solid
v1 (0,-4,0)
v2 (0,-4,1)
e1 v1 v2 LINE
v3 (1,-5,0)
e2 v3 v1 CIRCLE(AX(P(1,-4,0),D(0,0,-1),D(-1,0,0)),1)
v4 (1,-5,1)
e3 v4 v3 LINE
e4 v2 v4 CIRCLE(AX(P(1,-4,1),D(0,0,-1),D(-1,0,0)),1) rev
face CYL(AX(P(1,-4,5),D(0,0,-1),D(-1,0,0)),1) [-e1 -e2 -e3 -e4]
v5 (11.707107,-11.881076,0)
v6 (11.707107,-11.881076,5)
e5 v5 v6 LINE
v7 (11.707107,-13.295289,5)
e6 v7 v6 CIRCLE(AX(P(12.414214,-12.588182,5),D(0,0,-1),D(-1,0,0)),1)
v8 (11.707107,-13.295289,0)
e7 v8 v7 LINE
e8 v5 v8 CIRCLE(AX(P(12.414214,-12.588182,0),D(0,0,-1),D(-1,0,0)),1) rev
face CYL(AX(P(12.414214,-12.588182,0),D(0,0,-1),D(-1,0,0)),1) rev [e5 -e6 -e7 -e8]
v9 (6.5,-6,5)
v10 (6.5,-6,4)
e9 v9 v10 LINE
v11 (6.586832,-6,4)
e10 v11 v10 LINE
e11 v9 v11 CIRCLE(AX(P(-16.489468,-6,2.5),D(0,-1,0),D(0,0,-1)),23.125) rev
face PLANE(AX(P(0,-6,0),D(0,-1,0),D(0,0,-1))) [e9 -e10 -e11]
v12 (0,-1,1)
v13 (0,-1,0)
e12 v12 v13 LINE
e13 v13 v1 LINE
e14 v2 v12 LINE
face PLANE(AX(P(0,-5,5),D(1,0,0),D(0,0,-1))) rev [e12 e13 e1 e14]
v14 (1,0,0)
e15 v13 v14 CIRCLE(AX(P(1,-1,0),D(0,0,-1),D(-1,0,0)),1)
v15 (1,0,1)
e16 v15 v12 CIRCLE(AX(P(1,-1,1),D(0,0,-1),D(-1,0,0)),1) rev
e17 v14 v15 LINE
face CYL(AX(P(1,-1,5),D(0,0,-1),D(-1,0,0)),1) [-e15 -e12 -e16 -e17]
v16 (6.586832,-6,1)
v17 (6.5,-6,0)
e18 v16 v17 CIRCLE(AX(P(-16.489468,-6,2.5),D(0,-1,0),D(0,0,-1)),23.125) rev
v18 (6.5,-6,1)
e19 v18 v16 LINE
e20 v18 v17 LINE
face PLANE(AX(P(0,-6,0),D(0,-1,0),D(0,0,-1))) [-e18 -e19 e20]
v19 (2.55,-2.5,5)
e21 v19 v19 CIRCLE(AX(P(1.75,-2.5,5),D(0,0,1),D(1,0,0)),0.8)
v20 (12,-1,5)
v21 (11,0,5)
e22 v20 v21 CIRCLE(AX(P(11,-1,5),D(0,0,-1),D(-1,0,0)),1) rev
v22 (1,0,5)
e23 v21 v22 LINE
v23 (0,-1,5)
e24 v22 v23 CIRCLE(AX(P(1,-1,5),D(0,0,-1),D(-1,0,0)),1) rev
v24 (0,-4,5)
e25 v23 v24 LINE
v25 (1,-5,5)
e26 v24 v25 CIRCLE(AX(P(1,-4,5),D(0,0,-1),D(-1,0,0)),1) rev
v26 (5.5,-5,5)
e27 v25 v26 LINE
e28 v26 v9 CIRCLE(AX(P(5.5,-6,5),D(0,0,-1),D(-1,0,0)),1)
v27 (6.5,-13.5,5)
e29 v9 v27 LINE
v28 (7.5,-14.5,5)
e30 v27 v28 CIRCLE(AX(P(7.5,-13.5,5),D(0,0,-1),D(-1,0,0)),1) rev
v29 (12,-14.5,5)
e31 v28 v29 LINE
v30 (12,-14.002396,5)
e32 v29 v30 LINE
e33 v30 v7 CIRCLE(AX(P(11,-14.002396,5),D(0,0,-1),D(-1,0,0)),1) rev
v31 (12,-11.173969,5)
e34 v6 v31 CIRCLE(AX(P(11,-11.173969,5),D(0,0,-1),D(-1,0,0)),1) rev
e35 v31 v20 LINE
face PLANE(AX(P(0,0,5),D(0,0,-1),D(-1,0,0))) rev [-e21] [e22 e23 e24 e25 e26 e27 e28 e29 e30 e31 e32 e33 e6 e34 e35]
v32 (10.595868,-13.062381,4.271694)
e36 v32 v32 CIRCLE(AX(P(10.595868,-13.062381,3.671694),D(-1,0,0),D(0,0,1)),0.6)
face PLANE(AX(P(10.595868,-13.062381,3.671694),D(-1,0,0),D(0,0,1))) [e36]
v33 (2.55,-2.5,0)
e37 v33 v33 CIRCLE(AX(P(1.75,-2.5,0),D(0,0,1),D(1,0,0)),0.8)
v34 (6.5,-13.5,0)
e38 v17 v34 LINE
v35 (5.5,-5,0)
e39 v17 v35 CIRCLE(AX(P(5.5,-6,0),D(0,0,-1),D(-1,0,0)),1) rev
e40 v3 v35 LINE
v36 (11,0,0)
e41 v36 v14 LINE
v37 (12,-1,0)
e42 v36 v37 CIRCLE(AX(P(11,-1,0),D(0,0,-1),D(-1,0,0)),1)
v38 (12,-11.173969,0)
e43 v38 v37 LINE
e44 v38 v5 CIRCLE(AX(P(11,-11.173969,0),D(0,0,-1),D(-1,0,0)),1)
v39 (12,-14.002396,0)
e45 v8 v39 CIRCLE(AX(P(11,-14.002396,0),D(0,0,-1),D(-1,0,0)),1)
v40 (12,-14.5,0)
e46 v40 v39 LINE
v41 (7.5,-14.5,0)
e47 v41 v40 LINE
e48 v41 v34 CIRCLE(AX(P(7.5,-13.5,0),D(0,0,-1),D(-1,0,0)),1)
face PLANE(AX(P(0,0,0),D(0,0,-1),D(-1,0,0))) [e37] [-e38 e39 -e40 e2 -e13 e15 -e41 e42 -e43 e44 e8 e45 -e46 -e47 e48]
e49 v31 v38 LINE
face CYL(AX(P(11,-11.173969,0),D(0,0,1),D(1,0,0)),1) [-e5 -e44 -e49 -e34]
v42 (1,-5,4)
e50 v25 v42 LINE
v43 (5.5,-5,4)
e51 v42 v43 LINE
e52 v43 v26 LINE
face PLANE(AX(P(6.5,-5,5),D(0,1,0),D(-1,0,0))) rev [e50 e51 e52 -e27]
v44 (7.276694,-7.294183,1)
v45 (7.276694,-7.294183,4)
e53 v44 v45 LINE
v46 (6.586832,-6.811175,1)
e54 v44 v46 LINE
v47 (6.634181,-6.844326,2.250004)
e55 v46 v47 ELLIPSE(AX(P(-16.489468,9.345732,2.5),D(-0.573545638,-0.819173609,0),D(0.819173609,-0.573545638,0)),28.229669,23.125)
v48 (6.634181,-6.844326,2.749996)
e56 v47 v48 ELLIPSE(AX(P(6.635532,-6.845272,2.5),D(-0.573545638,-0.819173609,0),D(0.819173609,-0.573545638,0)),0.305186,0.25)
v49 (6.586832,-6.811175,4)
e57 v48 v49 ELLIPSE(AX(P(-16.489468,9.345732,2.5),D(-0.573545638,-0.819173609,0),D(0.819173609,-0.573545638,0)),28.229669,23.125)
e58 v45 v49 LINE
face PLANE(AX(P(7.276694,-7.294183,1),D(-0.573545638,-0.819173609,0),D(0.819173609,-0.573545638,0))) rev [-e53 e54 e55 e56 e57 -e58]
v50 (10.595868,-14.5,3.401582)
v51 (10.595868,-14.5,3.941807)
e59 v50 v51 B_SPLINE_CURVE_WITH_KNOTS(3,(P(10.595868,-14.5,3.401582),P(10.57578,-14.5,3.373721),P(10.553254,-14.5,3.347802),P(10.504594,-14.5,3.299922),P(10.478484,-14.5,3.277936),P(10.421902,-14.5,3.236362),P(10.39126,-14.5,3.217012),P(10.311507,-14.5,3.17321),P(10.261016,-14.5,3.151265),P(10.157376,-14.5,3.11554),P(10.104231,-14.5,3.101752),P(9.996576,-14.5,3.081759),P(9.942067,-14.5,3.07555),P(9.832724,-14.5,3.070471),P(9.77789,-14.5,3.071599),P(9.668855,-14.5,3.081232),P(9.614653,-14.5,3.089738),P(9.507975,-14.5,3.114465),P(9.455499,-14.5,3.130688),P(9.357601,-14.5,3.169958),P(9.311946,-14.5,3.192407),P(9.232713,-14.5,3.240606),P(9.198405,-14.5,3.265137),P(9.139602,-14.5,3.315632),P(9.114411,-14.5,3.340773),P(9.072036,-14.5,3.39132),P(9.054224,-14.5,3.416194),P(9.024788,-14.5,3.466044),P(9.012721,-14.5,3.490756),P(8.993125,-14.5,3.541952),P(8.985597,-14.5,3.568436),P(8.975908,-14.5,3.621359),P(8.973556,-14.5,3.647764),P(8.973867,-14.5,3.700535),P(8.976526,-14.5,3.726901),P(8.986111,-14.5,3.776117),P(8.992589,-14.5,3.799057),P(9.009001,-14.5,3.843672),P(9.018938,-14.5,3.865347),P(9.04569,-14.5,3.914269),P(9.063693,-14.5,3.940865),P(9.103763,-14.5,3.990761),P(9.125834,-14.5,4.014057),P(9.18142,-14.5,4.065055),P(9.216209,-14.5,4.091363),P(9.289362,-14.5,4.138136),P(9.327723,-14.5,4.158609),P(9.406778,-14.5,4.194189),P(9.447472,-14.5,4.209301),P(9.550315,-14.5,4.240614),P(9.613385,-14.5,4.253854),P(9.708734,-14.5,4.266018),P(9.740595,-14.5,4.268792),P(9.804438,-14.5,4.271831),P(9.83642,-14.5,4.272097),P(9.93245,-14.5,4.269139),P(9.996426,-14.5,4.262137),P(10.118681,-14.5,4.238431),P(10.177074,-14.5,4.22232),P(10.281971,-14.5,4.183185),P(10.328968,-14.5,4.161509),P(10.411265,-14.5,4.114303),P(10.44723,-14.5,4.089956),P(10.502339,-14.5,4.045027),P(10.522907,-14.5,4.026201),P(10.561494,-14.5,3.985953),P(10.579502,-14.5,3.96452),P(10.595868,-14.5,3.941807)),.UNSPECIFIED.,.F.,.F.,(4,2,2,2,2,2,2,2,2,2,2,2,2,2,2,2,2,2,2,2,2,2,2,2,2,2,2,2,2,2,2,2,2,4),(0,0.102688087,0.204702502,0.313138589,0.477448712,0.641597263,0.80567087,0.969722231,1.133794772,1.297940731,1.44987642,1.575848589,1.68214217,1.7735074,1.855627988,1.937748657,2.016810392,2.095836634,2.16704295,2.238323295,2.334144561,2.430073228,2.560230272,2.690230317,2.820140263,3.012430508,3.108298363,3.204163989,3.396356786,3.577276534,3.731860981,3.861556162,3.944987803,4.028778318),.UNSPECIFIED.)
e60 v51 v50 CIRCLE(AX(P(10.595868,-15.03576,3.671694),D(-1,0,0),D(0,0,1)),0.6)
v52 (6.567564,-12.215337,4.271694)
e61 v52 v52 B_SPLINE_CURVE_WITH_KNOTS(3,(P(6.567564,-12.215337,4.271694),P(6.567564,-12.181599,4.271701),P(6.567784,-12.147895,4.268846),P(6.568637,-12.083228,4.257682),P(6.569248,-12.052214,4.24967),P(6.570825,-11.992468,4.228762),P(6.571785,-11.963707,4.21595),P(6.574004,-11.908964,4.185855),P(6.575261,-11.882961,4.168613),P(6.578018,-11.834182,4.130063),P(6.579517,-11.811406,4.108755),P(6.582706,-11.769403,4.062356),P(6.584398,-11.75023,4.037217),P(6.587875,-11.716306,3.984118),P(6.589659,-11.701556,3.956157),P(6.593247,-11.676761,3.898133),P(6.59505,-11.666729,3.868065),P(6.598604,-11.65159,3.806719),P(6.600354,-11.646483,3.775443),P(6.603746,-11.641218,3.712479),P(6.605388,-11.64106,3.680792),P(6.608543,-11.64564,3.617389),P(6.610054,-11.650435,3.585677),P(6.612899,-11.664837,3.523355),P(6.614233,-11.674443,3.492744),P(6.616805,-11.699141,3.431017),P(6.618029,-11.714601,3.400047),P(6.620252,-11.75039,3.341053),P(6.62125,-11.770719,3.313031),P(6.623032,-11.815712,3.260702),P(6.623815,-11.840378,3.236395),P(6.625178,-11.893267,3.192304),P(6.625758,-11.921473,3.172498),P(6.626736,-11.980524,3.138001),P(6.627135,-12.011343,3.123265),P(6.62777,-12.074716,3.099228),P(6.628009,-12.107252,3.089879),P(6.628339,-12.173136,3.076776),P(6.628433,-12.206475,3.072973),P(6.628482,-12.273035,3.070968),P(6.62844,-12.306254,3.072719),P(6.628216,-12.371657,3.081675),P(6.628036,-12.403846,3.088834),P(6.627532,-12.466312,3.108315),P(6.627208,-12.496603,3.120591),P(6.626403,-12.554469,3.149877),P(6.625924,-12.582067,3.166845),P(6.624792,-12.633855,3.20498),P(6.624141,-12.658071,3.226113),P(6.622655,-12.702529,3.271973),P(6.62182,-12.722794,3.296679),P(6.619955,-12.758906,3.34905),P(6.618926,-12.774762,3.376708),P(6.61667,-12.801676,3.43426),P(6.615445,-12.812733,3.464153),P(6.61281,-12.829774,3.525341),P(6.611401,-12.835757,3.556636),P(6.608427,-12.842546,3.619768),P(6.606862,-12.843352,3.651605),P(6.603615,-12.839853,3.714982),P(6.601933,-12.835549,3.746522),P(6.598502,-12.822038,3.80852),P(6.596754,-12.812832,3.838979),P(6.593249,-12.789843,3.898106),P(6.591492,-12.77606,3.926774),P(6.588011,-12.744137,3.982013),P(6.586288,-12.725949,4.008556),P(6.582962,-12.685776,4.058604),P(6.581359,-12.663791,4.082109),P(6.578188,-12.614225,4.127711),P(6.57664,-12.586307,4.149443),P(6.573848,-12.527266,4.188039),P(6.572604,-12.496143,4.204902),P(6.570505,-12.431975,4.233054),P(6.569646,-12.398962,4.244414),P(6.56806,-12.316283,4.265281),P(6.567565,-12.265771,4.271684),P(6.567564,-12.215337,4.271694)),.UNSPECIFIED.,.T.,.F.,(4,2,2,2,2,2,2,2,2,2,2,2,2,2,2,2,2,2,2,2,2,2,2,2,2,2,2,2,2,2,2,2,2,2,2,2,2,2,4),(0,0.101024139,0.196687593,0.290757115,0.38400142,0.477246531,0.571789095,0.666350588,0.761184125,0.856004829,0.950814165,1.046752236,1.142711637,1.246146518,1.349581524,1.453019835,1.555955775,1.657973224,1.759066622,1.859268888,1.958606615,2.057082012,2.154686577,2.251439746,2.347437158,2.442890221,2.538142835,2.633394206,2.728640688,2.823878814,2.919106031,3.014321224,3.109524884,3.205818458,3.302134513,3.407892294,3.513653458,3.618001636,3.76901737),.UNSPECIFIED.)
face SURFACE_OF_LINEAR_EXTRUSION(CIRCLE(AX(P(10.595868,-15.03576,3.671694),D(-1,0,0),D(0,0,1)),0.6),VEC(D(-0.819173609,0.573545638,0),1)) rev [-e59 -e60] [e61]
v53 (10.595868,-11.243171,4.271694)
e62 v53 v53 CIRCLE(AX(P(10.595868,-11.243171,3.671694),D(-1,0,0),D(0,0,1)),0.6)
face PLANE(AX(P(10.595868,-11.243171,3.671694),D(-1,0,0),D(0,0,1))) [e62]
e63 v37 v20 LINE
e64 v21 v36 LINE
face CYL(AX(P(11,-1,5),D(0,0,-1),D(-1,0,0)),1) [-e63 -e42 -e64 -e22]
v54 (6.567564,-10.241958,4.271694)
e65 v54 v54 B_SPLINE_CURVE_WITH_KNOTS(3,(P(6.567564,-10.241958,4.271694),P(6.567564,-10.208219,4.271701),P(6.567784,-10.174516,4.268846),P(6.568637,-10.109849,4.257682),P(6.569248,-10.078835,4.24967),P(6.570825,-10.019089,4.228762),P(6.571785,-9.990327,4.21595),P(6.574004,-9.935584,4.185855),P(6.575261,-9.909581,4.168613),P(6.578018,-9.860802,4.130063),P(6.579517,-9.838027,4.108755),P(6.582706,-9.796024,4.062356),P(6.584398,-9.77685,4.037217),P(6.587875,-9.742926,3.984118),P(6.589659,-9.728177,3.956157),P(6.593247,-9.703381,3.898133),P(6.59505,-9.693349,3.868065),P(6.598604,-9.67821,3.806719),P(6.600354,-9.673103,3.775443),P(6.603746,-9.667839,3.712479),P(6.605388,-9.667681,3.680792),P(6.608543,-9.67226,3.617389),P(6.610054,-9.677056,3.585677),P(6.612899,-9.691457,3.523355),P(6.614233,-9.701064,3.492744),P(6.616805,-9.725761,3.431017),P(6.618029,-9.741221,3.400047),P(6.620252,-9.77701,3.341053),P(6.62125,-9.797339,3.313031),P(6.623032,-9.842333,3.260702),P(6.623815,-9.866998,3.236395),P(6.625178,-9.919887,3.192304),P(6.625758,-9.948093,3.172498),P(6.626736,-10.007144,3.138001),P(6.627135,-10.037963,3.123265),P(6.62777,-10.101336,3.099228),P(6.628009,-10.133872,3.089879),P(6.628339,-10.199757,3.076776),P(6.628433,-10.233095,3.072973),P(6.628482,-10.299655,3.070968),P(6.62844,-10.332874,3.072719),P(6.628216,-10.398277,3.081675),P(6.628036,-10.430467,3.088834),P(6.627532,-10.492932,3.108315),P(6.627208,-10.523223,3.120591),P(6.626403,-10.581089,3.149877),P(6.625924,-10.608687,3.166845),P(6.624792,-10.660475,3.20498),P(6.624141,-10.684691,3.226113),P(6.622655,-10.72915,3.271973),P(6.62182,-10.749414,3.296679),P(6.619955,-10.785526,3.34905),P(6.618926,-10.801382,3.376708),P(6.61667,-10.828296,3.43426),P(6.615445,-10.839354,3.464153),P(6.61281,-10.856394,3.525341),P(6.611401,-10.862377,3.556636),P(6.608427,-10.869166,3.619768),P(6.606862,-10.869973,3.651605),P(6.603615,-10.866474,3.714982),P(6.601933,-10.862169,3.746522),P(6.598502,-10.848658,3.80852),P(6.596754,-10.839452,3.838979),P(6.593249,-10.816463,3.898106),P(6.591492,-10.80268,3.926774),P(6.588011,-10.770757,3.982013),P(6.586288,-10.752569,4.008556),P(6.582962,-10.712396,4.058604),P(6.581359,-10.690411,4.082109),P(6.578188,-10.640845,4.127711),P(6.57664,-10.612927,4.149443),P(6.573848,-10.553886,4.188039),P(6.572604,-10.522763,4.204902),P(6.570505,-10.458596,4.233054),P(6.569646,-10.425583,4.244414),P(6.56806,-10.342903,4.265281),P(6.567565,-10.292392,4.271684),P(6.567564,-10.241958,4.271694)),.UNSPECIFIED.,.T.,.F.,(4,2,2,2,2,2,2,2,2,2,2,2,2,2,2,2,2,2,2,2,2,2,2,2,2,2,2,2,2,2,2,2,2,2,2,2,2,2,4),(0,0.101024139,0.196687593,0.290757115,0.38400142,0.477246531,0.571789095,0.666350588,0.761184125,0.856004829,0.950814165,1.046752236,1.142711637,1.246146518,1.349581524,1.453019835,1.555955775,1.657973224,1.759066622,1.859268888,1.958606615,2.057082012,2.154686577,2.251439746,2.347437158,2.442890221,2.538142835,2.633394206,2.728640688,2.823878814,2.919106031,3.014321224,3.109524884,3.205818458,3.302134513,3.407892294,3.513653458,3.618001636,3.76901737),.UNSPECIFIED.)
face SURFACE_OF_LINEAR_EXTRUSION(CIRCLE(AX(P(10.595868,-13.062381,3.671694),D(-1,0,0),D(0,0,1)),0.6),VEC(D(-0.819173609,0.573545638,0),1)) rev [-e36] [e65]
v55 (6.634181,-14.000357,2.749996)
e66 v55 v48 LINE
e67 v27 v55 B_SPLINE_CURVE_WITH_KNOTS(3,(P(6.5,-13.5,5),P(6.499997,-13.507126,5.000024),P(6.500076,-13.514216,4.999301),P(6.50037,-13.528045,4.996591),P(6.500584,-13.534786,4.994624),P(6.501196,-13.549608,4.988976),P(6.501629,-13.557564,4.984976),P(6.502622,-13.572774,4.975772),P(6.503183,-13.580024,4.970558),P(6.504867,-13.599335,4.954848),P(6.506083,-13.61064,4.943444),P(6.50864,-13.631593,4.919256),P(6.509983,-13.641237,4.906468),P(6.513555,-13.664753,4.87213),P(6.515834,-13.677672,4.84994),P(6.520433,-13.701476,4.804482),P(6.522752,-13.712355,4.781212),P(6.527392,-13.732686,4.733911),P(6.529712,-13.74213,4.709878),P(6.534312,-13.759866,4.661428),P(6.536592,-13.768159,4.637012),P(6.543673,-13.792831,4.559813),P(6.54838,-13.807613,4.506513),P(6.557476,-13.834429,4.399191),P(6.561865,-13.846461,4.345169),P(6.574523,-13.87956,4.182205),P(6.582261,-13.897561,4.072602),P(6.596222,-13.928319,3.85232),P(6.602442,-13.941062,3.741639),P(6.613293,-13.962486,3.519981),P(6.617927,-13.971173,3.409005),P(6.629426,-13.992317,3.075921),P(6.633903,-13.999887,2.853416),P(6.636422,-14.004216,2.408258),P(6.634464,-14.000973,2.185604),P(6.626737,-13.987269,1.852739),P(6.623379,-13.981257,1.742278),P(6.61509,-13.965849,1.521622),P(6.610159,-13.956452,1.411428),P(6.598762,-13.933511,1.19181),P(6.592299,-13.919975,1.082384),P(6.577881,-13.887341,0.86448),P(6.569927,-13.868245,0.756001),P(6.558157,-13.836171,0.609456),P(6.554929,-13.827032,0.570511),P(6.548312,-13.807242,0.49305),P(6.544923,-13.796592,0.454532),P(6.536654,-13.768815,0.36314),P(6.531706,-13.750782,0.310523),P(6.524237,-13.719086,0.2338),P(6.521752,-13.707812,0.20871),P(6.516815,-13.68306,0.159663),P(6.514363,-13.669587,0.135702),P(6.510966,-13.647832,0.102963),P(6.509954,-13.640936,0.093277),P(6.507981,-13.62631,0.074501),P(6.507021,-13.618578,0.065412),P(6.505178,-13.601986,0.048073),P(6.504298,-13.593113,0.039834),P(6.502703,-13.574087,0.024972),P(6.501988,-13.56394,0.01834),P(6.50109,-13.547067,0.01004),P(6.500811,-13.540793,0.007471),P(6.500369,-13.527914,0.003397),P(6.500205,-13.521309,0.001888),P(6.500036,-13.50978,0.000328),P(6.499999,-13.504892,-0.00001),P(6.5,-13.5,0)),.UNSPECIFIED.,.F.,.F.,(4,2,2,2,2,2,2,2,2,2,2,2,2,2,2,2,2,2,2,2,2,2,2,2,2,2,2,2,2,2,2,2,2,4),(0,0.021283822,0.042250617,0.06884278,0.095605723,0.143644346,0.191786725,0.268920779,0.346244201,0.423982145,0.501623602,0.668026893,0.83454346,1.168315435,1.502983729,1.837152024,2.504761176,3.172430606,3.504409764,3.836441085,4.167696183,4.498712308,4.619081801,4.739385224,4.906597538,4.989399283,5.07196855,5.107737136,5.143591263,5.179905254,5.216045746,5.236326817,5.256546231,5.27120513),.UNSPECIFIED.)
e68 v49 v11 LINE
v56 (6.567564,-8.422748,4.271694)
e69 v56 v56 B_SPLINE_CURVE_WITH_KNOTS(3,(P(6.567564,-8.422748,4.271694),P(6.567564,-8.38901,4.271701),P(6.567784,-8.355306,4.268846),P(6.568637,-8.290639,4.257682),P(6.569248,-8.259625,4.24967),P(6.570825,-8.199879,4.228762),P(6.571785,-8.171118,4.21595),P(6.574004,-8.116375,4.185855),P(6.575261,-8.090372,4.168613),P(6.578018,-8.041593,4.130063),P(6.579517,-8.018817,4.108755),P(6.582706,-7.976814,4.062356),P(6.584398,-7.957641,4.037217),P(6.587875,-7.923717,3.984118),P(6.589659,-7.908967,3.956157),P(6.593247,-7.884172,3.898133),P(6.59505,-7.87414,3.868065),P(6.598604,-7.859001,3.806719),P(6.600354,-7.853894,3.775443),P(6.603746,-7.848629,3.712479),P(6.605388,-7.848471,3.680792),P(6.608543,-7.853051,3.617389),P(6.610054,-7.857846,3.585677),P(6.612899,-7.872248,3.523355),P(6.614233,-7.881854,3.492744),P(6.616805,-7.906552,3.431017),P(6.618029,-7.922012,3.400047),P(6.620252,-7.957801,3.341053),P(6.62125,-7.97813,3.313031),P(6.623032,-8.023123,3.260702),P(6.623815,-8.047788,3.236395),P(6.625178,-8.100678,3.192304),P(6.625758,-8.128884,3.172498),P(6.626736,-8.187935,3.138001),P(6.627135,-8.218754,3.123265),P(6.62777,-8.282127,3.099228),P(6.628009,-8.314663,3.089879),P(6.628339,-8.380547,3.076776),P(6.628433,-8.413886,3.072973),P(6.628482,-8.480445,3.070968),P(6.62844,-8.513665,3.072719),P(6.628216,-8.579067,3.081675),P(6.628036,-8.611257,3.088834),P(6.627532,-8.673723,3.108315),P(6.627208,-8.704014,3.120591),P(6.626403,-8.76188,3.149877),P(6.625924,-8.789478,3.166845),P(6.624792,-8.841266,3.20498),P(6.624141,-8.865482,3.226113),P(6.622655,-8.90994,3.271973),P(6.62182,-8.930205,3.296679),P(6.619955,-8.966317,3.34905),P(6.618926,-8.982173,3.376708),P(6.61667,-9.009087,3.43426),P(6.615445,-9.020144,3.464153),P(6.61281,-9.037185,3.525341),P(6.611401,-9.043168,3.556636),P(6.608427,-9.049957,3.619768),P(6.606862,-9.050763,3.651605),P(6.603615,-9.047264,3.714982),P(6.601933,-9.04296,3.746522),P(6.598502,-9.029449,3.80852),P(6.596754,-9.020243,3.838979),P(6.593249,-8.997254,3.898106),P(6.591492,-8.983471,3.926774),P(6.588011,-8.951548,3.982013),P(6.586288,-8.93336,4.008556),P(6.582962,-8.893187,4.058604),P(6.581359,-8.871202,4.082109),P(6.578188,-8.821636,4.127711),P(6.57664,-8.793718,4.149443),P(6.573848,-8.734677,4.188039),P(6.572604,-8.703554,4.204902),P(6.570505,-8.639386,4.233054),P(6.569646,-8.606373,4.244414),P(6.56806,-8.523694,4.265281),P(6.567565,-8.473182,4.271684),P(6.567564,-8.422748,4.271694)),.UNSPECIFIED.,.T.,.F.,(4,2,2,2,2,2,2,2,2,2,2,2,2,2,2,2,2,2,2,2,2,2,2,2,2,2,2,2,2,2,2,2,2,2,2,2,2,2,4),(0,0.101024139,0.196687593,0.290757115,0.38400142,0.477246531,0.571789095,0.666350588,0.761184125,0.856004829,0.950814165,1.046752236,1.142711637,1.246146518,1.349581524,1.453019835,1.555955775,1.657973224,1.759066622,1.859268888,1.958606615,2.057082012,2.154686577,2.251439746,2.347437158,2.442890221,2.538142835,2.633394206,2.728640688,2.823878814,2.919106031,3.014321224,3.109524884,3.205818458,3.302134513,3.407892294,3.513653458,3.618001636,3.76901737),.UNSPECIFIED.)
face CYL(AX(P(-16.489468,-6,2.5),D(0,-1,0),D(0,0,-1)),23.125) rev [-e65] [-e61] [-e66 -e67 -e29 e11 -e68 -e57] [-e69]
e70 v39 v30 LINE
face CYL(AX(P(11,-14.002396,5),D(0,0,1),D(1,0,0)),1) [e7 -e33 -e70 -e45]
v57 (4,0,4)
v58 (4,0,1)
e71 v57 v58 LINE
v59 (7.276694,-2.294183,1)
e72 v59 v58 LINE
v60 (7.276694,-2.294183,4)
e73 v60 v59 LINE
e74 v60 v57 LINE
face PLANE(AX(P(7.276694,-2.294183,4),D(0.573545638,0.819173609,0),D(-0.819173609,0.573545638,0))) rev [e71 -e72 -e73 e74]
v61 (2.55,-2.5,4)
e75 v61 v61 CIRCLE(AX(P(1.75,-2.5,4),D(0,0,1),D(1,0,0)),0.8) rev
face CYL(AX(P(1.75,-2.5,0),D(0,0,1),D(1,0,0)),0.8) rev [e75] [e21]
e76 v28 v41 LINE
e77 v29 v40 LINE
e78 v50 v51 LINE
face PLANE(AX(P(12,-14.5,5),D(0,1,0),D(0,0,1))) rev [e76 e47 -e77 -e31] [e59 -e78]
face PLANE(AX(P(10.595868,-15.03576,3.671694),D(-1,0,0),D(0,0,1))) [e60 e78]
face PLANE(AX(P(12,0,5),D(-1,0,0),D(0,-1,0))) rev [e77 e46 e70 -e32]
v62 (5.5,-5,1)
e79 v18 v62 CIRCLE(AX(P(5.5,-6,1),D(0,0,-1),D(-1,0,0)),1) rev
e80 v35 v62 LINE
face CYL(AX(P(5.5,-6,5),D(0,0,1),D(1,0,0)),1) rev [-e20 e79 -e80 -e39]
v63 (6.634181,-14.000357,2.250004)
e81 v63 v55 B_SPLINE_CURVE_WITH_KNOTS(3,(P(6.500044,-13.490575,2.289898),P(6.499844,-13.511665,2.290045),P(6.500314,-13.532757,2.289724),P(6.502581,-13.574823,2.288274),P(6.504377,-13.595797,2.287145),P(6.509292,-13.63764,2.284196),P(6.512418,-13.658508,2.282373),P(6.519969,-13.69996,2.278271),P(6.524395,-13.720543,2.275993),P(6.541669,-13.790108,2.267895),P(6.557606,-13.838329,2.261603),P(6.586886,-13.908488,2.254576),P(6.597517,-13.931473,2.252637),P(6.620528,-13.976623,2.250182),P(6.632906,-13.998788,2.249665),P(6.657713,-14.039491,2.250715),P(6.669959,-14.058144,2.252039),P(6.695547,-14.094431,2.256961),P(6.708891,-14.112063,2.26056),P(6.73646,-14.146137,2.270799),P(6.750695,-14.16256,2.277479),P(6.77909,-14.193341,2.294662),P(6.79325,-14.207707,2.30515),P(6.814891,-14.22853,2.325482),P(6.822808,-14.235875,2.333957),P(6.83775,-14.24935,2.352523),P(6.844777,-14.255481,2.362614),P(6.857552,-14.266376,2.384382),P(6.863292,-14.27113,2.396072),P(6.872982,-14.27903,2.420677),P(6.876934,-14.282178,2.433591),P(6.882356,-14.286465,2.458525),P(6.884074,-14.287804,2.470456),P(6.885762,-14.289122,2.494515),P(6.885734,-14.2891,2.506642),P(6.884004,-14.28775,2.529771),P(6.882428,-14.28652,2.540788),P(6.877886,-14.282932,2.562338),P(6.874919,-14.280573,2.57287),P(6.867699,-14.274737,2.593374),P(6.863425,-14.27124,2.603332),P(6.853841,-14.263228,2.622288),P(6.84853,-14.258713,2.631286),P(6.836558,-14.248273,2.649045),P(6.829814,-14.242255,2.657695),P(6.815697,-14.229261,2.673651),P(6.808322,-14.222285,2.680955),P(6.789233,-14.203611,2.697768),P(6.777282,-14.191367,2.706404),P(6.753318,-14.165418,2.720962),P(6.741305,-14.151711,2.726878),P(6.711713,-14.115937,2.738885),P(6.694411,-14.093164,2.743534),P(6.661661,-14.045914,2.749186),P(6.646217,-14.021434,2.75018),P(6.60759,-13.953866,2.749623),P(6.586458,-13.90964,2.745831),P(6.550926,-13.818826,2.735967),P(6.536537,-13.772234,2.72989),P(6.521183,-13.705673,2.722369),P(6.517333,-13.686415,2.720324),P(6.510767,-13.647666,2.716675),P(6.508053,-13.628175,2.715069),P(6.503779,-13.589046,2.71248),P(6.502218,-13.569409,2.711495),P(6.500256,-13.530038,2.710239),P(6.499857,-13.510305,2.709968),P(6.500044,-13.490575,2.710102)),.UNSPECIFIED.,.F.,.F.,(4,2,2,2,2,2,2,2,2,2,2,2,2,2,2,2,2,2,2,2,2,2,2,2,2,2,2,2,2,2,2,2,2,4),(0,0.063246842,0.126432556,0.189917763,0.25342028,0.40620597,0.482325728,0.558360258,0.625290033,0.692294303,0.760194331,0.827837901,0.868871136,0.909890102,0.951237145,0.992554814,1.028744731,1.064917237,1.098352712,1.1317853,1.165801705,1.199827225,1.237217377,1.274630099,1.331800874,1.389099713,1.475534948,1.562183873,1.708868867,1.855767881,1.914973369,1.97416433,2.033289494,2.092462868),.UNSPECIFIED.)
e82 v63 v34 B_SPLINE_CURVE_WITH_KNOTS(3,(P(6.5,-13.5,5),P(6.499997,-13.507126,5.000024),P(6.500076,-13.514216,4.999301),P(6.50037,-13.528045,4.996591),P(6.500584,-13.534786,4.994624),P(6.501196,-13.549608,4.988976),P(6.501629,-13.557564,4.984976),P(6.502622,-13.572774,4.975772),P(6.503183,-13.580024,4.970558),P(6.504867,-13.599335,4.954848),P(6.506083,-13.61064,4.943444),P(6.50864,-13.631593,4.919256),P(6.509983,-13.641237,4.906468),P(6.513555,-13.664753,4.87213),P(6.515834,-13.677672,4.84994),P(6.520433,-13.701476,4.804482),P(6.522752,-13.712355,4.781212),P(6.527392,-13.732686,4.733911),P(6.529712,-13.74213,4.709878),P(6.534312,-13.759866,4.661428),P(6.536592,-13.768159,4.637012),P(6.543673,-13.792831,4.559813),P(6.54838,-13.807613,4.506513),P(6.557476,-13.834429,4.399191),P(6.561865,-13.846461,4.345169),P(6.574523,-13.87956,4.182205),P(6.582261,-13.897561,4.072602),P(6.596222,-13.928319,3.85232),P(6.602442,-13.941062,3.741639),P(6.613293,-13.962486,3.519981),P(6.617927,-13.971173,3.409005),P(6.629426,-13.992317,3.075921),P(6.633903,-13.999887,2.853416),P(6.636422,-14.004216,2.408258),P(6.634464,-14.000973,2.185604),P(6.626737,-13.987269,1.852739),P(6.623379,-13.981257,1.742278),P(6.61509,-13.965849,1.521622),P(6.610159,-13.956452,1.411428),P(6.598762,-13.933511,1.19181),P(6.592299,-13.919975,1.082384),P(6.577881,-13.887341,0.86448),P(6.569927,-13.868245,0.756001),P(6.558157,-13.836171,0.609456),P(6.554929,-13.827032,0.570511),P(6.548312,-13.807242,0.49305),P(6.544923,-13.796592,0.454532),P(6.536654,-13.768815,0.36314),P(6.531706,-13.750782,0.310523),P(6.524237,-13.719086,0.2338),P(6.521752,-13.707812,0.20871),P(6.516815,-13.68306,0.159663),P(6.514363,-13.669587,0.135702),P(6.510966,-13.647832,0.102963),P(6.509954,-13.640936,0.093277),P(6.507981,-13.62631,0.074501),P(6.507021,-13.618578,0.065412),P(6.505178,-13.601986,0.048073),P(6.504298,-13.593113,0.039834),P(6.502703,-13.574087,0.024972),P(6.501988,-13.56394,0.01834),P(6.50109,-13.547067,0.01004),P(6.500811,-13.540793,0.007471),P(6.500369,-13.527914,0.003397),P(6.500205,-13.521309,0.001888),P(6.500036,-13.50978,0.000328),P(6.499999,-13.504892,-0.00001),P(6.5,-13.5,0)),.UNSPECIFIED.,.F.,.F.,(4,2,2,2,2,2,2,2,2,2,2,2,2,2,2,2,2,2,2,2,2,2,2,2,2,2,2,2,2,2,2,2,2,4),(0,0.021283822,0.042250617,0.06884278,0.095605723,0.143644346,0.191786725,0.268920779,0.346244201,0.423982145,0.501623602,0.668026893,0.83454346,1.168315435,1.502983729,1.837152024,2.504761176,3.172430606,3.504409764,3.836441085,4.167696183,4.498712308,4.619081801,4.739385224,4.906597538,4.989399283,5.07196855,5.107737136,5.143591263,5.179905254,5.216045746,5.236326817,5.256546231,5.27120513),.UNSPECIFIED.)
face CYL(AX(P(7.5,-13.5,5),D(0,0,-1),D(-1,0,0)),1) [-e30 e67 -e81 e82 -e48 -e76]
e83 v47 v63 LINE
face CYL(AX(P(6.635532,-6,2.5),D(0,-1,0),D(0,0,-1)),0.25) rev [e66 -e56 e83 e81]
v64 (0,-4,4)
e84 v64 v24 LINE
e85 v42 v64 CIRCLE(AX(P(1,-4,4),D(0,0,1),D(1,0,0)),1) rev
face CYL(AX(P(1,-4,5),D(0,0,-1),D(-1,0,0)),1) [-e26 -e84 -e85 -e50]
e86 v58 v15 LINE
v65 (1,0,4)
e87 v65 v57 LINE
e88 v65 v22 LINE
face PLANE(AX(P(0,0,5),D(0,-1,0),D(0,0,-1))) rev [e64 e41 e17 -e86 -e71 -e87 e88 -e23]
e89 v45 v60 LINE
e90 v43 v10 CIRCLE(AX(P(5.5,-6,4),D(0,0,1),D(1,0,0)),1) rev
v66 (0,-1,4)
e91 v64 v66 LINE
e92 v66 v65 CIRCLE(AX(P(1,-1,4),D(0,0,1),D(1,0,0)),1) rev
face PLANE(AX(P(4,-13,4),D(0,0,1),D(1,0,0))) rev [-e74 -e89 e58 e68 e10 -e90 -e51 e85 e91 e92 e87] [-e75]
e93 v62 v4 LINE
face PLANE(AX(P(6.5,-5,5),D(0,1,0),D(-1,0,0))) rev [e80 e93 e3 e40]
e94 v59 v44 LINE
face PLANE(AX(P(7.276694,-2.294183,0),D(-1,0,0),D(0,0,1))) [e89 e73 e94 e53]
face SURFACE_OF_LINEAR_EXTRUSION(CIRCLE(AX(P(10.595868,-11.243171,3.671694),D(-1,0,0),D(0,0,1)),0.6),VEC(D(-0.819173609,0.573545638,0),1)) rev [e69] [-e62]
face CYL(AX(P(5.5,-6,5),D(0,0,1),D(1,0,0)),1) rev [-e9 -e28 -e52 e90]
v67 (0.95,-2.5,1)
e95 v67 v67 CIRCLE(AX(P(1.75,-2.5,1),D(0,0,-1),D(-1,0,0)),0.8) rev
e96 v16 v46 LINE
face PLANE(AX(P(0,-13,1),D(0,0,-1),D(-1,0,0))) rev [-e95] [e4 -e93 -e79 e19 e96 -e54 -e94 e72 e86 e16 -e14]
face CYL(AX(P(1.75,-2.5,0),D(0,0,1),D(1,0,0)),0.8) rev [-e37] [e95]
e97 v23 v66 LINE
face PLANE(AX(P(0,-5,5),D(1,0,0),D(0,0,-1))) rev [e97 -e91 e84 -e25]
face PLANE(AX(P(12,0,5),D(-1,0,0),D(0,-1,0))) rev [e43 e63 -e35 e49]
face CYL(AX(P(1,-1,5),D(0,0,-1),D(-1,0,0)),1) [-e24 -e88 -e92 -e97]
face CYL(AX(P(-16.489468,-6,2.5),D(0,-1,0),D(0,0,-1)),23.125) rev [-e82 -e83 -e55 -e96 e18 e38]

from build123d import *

# Parameters (mm, degrees)
BOSS_EXTRUDE1_DEPTH = 5
SKETCH4_R           = 0.8
CUT_EXTRUDE3_DEPTH  = 20.474342094
SKETCH5_W           = 4
SKETCH5_H           = 3
CUT_EXTRUDE4_DEPTH  = 13
FILLET4_R           = 1
CUT_EXTRUDE5_DEPTH  = 20.474342094
FILLET6_R           = 1
CUT_EXTRUDE6_START  = -8.5
CUT_EXTRUDE6_DEPTH  = 8.002697112
SKETCH11_W          = 3
SKETCH11_H          = 5
CUT_EXTRUDE8_DEPTH  = 4
SKETCH12_R          = 0.6
CUT_EXTRUDE9_DEPTH  = 5
CUT_EXTRUDE10_REACH = 21.474
SKETCH9_R           = 0.25


# Read off the part's stored shape, not the designer's step: Cut-Extrude6
with BuildPart() as part:
    # Sketch1 → Boss-Extrude1 (new body)
    with BuildSketch(Plane.XY):
        Polygon((0, 0), (12, 0), (12, -14.5), (6.5, -14.5), (6.5, -5), (0, -5), align=None)
    extrude(amount=BOSS_EXTRUDE1_DEPTH)

    # Sketch4 → Cut-Extrude3 (cut, through all)
    with BuildSketch(Plane.XY.offset(5)):
        with Locations((1.75, -2.5)):
            Circle(SKETCH4_R)
    extrude(amount=-CUT_EXTRUDE3_DEPTH, mode=Mode.SUBTRACT)

    # Sketch5 → Cut-Extrude4 (cut)
    with BuildSketch(Plane(origin=(0, 0, 0), x_dir=(1, 0, 0), z_dir=(0, 1, 0))):
        with Locations((2, -2.5)):
            Rectangle(SKETCH5_W, SKETCH5_H)
    extrude(amount=-CUT_EXTRUDE4_DEPTH, mode=Mode.SUBTRACT)

    # Fillet4
    fillet4_edges = [part.edges().sort_by_distance(p)[0] for p in [
        (0, 0, 4.5),
        (0, -5, 4.5),
        (0, 0, 0.5),
        (0, -5, 0.5),
    ]]
    fillet(fillet4_edges, radius=FILLET4_R)

    # Sketch6 → Cut-Extrude5 (cut, through all)
    with BuildSketch(Plane.XY.offset(5)):
        Polygon((12, -13.588182425), (11, -12.588182425), (12, -11.588182425), align=None)
    extrude(amount=-CUT_EXTRUDE5_DEPTH, mode=Mode.SUBTRACT)

    # Fillet6
    fillet6_edges = [part.edges().sort_by_distance(p)[0] for p in [
        (11, -12.588182425, 2.5),
        (12, -13.588182425, 2.5),
        (12, -11.588182425, 2.5),
        (6.5, -5, 2.5),
        (6.5, -14.5, 2.5),
        (12, 0, 2.5),
    ]]
    fillet(fillet6_edges, radius=FILLET6_R - 0.0001)  # a hair under: the kernel refuses the full size

    # Cut-Extrude6 outline → Cut-Extrude6 (cut)
    with BuildSketch(Plane.XZ.offset(14.5).offset(CUT_EXTRUDE6_START)):
        with BuildLine():
            Line((6.49999436, 5.000051867), (6.499994078, -5.446e-05))
            ThreePointArc((6.499994078, -5.446e-05), (6.635532303, 2.499998696), (6.49999436, 5.000051867))
        make_face()
    extrude(amount=CUT_EXTRUDE6_DEPTH, mode=Mode.SUBTRACT)

    # Sketch11 → Cut-Extrude8 (cut, along a direction that is not the sketch's normal)
    with BuildSketch(Plane.ZY.offset(-4)):
        with Locations((2.5, -2.5)):
            Rectangle(SKETCH11_W, SKETCH11_H)
    extrude(amount=-CUT_EXTRUDE8_DEPTH, dir=(-0.8191736087025463, 0.5735456379445732, 0), mode=Mode.SUBTRACT)

    # Sketch12 → Cut-Extrude9 (cut, along a direction that is not the sketch's normal)
    with BuildSketch(Plane.ZY.offset(-6.5)):
        with Locations((3.671694189, -8.375443102)):
            Circle(SKETCH12_R)
        with Locations((3.671694189, -10.194652501)):
            Circle(SKETCH12_R)
        with Locations((3.671694189, -12.168032187)):
            Circle(SKETCH12_R)
    extrude(amount=-CUT_EXTRUDE9_DEPTH, dir=(-0.8191736087025463, 0.5735456379445732, 0), mode=Mode.SUBTRACT)

    # Cut-Extrude10: up to this plane
    cut_extrude10_end = Plane(origin=(7.276694435, -7.294182552, 1), z_dir=(-0.5735456379445732, -0.8191736087025463, 0))
    # Sketch9 → Cut-Extrude10 (cut, up to the surface)
    with BuildSketch(Plane.XZ.offset(14.5), mode=Mode.PRIVATE) as cut_extrude10_sk1:
        with Locations((6.635532303, 2.5)):
            Circle(SKETCH9_R)
    cut_extrude10_tool1 = split(extrude(cut_extrude10_sk1.sketch, amount=-CUT_EXTRUDE10_REACH, mode=Mode.PRIVATE), bisect_by=cut_extrude10_end, keep=Keep.BOTH, mode=Mode.PRIVATE)
    add(cut_extrude10_tool1.solids().sort_by_distance((6.635532, -14.5, 2.5))[0], mode=Mode.SUBTRACT)


solid = part.part
